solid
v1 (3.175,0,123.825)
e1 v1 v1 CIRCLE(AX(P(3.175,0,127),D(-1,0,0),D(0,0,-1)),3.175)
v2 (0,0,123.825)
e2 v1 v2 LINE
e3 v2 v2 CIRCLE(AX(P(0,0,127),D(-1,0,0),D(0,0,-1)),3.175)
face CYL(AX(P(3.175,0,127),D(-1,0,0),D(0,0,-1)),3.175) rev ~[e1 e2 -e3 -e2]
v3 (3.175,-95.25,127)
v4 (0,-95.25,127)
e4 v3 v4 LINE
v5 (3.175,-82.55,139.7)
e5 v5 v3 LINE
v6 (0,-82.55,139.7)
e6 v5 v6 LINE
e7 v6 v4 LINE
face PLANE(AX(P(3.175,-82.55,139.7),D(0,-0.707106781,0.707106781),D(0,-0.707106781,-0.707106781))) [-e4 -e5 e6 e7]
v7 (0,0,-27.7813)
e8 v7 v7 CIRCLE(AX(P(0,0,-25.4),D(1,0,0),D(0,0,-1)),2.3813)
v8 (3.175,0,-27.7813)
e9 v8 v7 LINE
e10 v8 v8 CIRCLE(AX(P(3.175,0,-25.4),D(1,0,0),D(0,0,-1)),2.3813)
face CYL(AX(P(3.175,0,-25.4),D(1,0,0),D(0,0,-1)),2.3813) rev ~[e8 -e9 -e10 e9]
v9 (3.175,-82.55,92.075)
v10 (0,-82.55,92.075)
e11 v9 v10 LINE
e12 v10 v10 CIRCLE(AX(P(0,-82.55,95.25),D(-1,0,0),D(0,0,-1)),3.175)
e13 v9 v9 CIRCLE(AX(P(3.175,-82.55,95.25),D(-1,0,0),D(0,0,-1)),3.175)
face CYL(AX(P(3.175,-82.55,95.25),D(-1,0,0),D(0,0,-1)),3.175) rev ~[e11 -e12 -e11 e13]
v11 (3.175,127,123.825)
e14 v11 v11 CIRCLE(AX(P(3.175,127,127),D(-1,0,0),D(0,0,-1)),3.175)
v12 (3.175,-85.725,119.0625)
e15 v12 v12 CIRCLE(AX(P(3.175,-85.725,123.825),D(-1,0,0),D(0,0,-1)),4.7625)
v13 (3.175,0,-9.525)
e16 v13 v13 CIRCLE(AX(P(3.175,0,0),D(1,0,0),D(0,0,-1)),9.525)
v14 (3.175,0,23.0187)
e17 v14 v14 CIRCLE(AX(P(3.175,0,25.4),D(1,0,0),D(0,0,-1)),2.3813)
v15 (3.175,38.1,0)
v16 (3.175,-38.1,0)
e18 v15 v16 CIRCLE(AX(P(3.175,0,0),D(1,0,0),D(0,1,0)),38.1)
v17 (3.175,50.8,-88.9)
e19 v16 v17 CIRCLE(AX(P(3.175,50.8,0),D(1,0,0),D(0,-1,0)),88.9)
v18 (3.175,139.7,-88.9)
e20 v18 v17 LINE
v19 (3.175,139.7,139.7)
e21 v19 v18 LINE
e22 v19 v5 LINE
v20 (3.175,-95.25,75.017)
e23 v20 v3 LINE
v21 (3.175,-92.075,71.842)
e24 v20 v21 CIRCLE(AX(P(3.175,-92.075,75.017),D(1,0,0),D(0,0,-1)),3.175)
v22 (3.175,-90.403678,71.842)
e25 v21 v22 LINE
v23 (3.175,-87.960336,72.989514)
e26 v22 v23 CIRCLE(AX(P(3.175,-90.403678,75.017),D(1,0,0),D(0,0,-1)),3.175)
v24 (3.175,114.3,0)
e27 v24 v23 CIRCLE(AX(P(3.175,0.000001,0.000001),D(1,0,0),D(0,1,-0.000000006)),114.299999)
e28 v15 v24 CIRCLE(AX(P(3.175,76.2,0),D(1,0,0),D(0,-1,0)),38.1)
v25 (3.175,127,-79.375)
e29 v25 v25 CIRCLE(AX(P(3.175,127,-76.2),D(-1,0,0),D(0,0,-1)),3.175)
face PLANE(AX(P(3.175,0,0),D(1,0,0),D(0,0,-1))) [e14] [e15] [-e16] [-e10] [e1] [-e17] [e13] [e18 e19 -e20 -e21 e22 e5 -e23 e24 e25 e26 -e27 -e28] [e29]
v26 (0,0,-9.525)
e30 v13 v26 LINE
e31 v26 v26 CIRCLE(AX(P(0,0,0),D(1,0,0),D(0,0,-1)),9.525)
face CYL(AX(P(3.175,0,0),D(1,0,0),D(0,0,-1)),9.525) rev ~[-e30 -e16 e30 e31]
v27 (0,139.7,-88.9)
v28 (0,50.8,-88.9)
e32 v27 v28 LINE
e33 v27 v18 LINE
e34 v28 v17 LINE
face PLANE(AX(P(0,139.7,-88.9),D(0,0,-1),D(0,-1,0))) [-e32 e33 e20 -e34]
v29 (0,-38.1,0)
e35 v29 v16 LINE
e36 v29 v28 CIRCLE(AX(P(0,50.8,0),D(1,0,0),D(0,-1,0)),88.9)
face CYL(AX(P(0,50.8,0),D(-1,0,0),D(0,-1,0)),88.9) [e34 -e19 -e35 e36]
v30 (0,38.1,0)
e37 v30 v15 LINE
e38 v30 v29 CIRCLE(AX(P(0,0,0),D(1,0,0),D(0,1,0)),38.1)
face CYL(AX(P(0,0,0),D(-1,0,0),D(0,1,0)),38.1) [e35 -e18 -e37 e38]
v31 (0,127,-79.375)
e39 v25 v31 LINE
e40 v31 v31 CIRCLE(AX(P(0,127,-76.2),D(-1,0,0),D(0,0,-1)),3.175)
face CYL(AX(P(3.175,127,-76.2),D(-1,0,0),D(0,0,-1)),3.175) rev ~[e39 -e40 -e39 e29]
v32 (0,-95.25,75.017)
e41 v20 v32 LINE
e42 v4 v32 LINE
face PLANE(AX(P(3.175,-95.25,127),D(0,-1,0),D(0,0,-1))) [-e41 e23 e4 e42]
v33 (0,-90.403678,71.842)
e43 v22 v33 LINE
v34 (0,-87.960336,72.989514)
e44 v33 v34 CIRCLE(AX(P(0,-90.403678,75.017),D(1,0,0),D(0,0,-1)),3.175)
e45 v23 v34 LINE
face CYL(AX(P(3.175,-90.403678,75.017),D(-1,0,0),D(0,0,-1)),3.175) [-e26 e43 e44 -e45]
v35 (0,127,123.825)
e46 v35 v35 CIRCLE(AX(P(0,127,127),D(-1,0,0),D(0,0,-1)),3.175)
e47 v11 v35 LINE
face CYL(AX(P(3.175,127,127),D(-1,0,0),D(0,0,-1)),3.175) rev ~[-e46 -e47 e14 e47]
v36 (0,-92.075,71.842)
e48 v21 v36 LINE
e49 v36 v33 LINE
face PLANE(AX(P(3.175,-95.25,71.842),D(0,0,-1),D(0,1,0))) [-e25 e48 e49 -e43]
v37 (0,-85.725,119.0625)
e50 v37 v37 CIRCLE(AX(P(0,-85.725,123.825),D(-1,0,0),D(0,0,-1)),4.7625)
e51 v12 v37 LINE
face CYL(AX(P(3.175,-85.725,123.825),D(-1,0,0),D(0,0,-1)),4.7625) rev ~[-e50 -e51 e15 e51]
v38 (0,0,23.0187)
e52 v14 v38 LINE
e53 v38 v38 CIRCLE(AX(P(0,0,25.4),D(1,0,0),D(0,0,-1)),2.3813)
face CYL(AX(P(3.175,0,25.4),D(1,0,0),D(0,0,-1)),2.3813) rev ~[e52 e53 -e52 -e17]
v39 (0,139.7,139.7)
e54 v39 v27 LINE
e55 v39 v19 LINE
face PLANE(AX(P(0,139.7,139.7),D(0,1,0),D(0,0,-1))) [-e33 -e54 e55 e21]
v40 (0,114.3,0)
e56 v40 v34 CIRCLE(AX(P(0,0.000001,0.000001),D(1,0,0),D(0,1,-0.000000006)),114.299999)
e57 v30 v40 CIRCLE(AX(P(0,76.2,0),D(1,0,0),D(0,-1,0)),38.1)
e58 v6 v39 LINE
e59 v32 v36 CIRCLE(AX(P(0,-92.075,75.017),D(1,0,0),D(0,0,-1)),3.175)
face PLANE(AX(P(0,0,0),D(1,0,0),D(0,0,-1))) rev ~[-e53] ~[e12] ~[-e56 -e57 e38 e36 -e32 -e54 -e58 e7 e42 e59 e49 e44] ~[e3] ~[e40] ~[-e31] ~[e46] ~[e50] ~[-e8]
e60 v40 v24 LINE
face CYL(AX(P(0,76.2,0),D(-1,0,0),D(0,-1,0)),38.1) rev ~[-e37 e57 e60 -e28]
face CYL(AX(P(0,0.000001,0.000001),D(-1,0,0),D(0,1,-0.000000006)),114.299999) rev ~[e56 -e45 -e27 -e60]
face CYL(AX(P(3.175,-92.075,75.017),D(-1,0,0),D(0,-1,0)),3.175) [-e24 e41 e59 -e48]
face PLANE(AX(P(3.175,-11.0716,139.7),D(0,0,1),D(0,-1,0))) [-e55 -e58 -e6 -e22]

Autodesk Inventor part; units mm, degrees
ref_plane "YZ Plane" through (0, 0, 0) normal (1, 0, 0) x (0, 1, 0)
ref_plane "XZ Plane" through (0, 0, 0) normal (0, 1, 0) x (-1, 0, 0)
ref_plane "XY Plane" through (0, 0, 0) normal (0, 0, 1) x (1, 0, 0)
sketch "Sketch1" plane through (0, 0, 0) normal (1, 0, 0) x (0, 1, 0)
  circle A0 centre (0, 0) radius 50.8 construction
  circle A1 centre (82.55, 0) radius 31.75 construction
  circle A2 centre (-82.55, 0) radius 31.75 construction
  circle A3 centre (0, 0) radius 114.3 construction
  circle A4 centre (0, 0) radius 38.1 construction
  arc A5 (38.1, 0) -> (114.3, 0) centre (76.2, 0) ccw construction
  arc A6 (-38.1, 0) -> (139.7, 0) centre (50.8, 0) ccw construction
  line L0 (50.8, -88.9) -> (139.7, -88.9) construction
  line L1 (139.7, -88.9) -> (139.7, 0) construction
  line L2 (139.7, 0) -> (-101.6, 0) construction
  line L3 (-101.6, 0) -> (-101.6, 139.7) construction
  line L4 (-101.6, 139.7) -> (139.7, 139.7) construction
  line L5 (139.7, 139.7) -> (139.7, 0) construction
  arc A7 (11.0716, 139.7) -> (-101.6, 96.52) centre (0, 0) ccw construction
  line L6 (-101.6, 139.7) -> (-101.6, 63.1817) construction
  line L7 (-101.6, 63.1817) -> (-95.25, 63.1817) construction
  arc A8 (-11.0716, 139.7) -> (-101.6, 96.52) centre (0, 0) ccw
  line L8 (-11.0716, 139.7) -> (139.7, 139.7)
  line L9 (139.7, 139.7) -> (139.7, -88.9)
  line L10 (139.7, -88.9) -> (50.8, -88.9)
  arc A9 (-38.1, 0) -> (50.8, -88.9) centre (50.8, 0) ccw
  arc A10 (38.1, 0) -> (-38.1, 0) centre (0, 0) ccw
  arc A11 (38.1, 0) -> (114.3, 0) centre (76.2, 0) ccw
  arc A12 (114.3, 0) -> (-95.25, 63.1817) centre (0, 0) ccw
  line L11 (-95.25, 63.1817) -> (-101.6, 63.1817)
  line L12 (-101.6, 96.52) -> (-101.6, 63.1817)
  dimension "d1" = 63.5
  dimension "d0" = 101.6
  dimension "d2" = 63.5
  dimension "d3" = 82.55
  dimension "d4" = 82.55
  dimension "d5" = 0
  dimension "d6" = 0
  dimension "d7" = 228.6
  dimension "d8" = 76.2
  dimension "d9" = 76.2
  dimension "d10" = 177.8
  dimension "d11" = 88.9
  dimension "d12" = 139.7
  dimension "d13" = 0
  dimension "d14" = 241.3
  dimension "d15" = 139.7
  dimension "d16" = 0
  dimension "d74" = 6.35
  dimension "d75" = 43.18
extrude "Extrusion1" add sketch "Sketch1" along normal blind 3.175
sketch "Sketch2" plane through (3.175, 0, 0) normal (1, 0, 0) x (0, 0, -1)
  arc A0 (0, 38.1) -> (0, -38.1) centre (0, 0) ccw projected
  arc A1 (0, -38.1) -> (88.9, 50.8) centre (0, 50.8) ccw projected
  line L0 (88.9, 50.8) -> (88.9, 139.7) projected
  line L1 (88.9, 139.7) -> (-139.7, 139.7) projected
  line L2 (-139.7, 139.7) -> (-139.7, -11.0716) projected
  arc A2 (-139.7, -11.0716) -> (-96.52, -101.6) centre (0, 0) ccw projected
  line L3 (-96.52, -101.6) -> (-63.1817, -101.6) projected
  line L4 (-63.1817, -101.6) -> (-63.1817, -95.25) projected
  arc A3 (0, 114.3) -> (-63.1817, -95.25) centre (0, 0) ccw projected
  arc A4 (0, 38.1) -> (0, 114.3) centre (0, 76.2) ccw projected
  line L5 (-63.1817, -101.6) -> (-139.3817, -101.6)
  line L6 (-139.3817, -101.6) -> (-139.3817, -95.25)
  line L7 (-139.3817, -95.25) -> (-63.1817, -95.25)
  line L8 (-63.1817, -95.25) -> (-63.1817, -101.6)
  arc A5 (0, 114.3) -> (-63.1817, -95.25) centre (0, 0) ccw projected
  line L9 (-63.1817, -101.6) -> (-71.842, -101.6)
  line L10 (-71.842, -101.6) -> (-71.842, -88.9)
  line L11 (-71.842, -88.9) -> (-63.1817, -88.9)
  line L12 (-63.1817, -88.9) -> (-63.1817, -101.6)
  point P0 (0, 0)
  dimension "d24" = 76.2
  dimension "d25" = 6.35
  dimension "d26" = 12.7
extrude "Extrusion2" cut sketch "Sketch2" against normal blind 3.175 contours L11 L12 A3 | A3 L7 L10 | L4 L3 L10 L7 | L10 L3 A2 L7 | A2 L5 L6 L7
sketch "Sketch3" plane through (3.175, 0, 0) normal (1, 0, 0) x (0, 0, -1)
  line L0 (-102.7916, -95.25) -> (-71.842, -95.25) projected
  line L1 (-71.842, -95.25) -> (-71.842, -88.9) projected
  arc A0 (0, 114.3) -> (-71.842, -88.9) centre (0, 0) ccw projected
  arc A1 (0, 38.1) -> (0, 114.3) centre (0, 76.2) ccw projected
  arc A2 (0, 38.1) -> (0, -38.1) centre (0, 0) ccw projected
  arc A3 (0, -38.1) -> (88.9, 50.8) centre (0, 50.8) ccw projected
  line L2 (88.9, 50.8) -> (88.9, 139.7) projected
  line L3 (88.9, 139.7) -> (-139.7, 139.7) projected
  line L4 (-139.7, 139.7) -> (-139.7, -11.0716) projected
  arc A4 (-139.7, -11.0716) -> (-102.7916, -95.25) centre (0, 0) ccw projected
  point P0 (0, 0)
  point P1 (-127, 127)
  point P2 (76.2, 127)
  point P3 (-95.25, -82.55)
  point P4 (-127, 0)
  dimension "d29" = 12.7
  dimension "d30" = 12.7
  dimension "d31" = 12.7
  dimension "d32" = 12.7
  dimension "d33" = 12.7
  dimension "d34" = 139.7
  dimension "d35" = 95.25
  dimension "d36" = 82.55
hole "Hole1" at (3.175, 127, 127) at (3.175, 127, -76.2) at (3.175, -82.55, 95.25) at (3.175, 0, 127) direction (-1, 0, 0) diameter 6.35 end through all
sketch "Sketch4" plane through (3.175, 0, 0) normal (1, 0, 0) x (0, 0, -1)
  circle A0 centre (-95.25, -82.55) radius 3.175 projected
  circle A1 centre (-127, 127) radius 3.175 projected
  circle A2 centre (76.2, 127) radius 3.175 projected
  circle A3 centre (-127, 0) radius 3.175 projected
  line L0 (-102.7916, -95.25) -> (-71.842, -95.25) projected
  line L1 (-71.842, -95.25) -> (-71.842, -88.9) projected
  arc A4 (0, 114.3) -> (-71.842, -88.9) centre (0, 0) ccw projected
  arc A5 (0, 38.1) -> (0, 114.3) centre (0, 76.2) ccw projected
  arc A6 (0, 38.1) -> (0, -38.1) centre (0, 0) ccw projected
  arc A7 (0, -38.1) -> (88.9, 50.8) centre (0, 50.8) ccw projected
  line L2 (88.9, 50.8) -> (88.9, 139.7) projected
  line L3 (88.9, 139.7) -> (-139.7, 139.7) projected
  line L4 (-139.7, 139.7) -> (-139.7, -11.0716) projected
  arc A8 (-139.7, -11.0716) -> (-102.7916, -95.25) centre (0, 0) ccw projected
  circle A9 centre (0, 0) radius 9.525
  circle A10 centre (-25.4, 0) radius 2.3813
  circle A11 centre (25.4, 0) radius 2.3813
  point P0 (0, 0)
  dimension "d44" = 0
  dimension "d45" = 0
  dimension "d46" = 25.4
  dimension "d47" = 25.4
  dimension "d55" = 19.05
  dimension "d56" = 4.7625
  dimension "d57" = 4.7625
extrude "Extrusion3" cut sketch "Sketch4" against normal blind 3.175 contours A9 | A10 | A11
sketch "Sketch5" plane through (3.175, 0, 0) normal (1, 0, 0) x (0, 0, -1)
  circle A0 centre (25.4, 0) radius 2.3813 projected
  circle A1 centre (-25.4, 0) radius 2.3813 projected
  circle A2 centre (0, 0) radius 9.525 projected
  circle A3 centre (-95.25, -82.55) radius 3.175 projected
  circle A4 centre (-127, 127) radius 3.175 projected
  circle A5 centre (76.2, 127) radius 3.175 projected
  circle A6 centre (-127, 0) radius 3.175 projected
  line L0 (-102.7916, -95.25) -> (-71.842, -95.25) projected
  line L1 (-71.842, -95.25) -> (-71.842, -88.9) projected
  arc A7 (0, 114.3) -> (-71.842, -88.9) centre (0, 0) ccw projected
  arc A8 (0, 38.1) -> (0, 114.3) centre (0, 76.2) ccw projected
  arc A9 (0, 38.1) -> (0, -38.1) centre (0, 0) ccw projected
  arc A10 (0, -38.1) -> (88.9, 50.8) centre (0, 50.8) ccw projected
  line L2 (88.9, 50.8) -> (88.9, 139.7) projected
  line L3 (88.9, 139.7) -> (-139.7, 139.7) projected
  line L4 (-139.7, 139.7) -> (-139.7, -11.0716) projected
  arc A11 (-139.7, -11.0716) -> (-102.7916, -95.25) centre (0, 0) ccw projected
  line L5 (-139.7, -11.0716) -> (-139.7, -95.25) construction
  line L6 (-139.7, -95.25) -> (-102.7916, -95.25) construction
  line L7 (-139.7, -95.25) -> (-127, -95.25) construction
  line L8 (-127, -95.25) -> (-127, -82.55) construction
  line L9 (-127, -82.55) -> (-139.7, -82.55) construction
  line L10 (-139.7, -82.55) -> (-139.7, -95.25) construction
  line L11 (-139.7, -11.0716) -> (-139.7, -82.55)
  line L12 (-139.7, -82.55) -> (-127, -95.25)
  line L13 (-127, -95.25) -> (-102.7916, -95.25)
  point P0 (0, 0)
  dimension "d60" = 12.7
  dimension "d61" = 12.7
extrude "Extrusion4" add sketch "Sketch5" against normal blind 3.175 contours L13 L12 L11 A11
sketch "Sketch6" plane through (3.175, 0, 0) normal (1, 0, 0) x (0, 0, -1)
  circle A0 centre (25.4, 0) radius 2.3813 projected
  circle A1 centre (-25.4, 0) radius 2.3813 projected
  circle A2 centre (0, 0) radius 9.525 projected
  circle A3 centre (-95.25, -82.55) radius 3.175 projected
  circle A4 centre (-127, 127) radius 3.175 projected
  circle A5 centre (76.2, 127) radius 3.175 projected
  circle A6 centre (-127, 0) radius 3.175 projected
  line L0 (-127, -95.25) -> (-71.842, -95.25) projected
  line L1 (-71.842, -95.25) -> (-71.842, -88.9) projected
  arc A7 (0, 114.3) -> (-71.842, -88.9) centre (0, 0) ccw projected
  arc A8 (0, 38.1) -> (0, 114.3) centre (0, 76.2) ccw projected
  arc A9 (0, 38.1) -> (0, -38.1) centre (0, 0) ccw projected
  arc A10 (0, -38.1) -> (88.9, 50.8) centre (0, 50.8) ccw projected
  line L2 (88.9, 50.8) -> (88.9, 139.7) projected
  line L3 (88.9, 139.7) -> (-139.7, 139.7) projected
  line L4 (-139.7, 139.7) -> (-139.7, -82.55) projected
  line L5 (-139.7, -82.55) -> (-127, -95.25) projected
  point P0 (0, 0)
  point P1 (-123.825, -85.725)
  dimension "d64" = 15.875
  dimension "d65" = 9.525
hole "Hole3" at (3.175, -85.725, 123.825) direction (-1, 0, 0) diameter 9.525 end through all
fillet "Fillet1" radius 3.175 2 edges at (1.5875, -95.25, 71.842) (1.5875, -88.9, 71.842)
properties part number "rail gearbox mounting" material "Aluminum 6061"
